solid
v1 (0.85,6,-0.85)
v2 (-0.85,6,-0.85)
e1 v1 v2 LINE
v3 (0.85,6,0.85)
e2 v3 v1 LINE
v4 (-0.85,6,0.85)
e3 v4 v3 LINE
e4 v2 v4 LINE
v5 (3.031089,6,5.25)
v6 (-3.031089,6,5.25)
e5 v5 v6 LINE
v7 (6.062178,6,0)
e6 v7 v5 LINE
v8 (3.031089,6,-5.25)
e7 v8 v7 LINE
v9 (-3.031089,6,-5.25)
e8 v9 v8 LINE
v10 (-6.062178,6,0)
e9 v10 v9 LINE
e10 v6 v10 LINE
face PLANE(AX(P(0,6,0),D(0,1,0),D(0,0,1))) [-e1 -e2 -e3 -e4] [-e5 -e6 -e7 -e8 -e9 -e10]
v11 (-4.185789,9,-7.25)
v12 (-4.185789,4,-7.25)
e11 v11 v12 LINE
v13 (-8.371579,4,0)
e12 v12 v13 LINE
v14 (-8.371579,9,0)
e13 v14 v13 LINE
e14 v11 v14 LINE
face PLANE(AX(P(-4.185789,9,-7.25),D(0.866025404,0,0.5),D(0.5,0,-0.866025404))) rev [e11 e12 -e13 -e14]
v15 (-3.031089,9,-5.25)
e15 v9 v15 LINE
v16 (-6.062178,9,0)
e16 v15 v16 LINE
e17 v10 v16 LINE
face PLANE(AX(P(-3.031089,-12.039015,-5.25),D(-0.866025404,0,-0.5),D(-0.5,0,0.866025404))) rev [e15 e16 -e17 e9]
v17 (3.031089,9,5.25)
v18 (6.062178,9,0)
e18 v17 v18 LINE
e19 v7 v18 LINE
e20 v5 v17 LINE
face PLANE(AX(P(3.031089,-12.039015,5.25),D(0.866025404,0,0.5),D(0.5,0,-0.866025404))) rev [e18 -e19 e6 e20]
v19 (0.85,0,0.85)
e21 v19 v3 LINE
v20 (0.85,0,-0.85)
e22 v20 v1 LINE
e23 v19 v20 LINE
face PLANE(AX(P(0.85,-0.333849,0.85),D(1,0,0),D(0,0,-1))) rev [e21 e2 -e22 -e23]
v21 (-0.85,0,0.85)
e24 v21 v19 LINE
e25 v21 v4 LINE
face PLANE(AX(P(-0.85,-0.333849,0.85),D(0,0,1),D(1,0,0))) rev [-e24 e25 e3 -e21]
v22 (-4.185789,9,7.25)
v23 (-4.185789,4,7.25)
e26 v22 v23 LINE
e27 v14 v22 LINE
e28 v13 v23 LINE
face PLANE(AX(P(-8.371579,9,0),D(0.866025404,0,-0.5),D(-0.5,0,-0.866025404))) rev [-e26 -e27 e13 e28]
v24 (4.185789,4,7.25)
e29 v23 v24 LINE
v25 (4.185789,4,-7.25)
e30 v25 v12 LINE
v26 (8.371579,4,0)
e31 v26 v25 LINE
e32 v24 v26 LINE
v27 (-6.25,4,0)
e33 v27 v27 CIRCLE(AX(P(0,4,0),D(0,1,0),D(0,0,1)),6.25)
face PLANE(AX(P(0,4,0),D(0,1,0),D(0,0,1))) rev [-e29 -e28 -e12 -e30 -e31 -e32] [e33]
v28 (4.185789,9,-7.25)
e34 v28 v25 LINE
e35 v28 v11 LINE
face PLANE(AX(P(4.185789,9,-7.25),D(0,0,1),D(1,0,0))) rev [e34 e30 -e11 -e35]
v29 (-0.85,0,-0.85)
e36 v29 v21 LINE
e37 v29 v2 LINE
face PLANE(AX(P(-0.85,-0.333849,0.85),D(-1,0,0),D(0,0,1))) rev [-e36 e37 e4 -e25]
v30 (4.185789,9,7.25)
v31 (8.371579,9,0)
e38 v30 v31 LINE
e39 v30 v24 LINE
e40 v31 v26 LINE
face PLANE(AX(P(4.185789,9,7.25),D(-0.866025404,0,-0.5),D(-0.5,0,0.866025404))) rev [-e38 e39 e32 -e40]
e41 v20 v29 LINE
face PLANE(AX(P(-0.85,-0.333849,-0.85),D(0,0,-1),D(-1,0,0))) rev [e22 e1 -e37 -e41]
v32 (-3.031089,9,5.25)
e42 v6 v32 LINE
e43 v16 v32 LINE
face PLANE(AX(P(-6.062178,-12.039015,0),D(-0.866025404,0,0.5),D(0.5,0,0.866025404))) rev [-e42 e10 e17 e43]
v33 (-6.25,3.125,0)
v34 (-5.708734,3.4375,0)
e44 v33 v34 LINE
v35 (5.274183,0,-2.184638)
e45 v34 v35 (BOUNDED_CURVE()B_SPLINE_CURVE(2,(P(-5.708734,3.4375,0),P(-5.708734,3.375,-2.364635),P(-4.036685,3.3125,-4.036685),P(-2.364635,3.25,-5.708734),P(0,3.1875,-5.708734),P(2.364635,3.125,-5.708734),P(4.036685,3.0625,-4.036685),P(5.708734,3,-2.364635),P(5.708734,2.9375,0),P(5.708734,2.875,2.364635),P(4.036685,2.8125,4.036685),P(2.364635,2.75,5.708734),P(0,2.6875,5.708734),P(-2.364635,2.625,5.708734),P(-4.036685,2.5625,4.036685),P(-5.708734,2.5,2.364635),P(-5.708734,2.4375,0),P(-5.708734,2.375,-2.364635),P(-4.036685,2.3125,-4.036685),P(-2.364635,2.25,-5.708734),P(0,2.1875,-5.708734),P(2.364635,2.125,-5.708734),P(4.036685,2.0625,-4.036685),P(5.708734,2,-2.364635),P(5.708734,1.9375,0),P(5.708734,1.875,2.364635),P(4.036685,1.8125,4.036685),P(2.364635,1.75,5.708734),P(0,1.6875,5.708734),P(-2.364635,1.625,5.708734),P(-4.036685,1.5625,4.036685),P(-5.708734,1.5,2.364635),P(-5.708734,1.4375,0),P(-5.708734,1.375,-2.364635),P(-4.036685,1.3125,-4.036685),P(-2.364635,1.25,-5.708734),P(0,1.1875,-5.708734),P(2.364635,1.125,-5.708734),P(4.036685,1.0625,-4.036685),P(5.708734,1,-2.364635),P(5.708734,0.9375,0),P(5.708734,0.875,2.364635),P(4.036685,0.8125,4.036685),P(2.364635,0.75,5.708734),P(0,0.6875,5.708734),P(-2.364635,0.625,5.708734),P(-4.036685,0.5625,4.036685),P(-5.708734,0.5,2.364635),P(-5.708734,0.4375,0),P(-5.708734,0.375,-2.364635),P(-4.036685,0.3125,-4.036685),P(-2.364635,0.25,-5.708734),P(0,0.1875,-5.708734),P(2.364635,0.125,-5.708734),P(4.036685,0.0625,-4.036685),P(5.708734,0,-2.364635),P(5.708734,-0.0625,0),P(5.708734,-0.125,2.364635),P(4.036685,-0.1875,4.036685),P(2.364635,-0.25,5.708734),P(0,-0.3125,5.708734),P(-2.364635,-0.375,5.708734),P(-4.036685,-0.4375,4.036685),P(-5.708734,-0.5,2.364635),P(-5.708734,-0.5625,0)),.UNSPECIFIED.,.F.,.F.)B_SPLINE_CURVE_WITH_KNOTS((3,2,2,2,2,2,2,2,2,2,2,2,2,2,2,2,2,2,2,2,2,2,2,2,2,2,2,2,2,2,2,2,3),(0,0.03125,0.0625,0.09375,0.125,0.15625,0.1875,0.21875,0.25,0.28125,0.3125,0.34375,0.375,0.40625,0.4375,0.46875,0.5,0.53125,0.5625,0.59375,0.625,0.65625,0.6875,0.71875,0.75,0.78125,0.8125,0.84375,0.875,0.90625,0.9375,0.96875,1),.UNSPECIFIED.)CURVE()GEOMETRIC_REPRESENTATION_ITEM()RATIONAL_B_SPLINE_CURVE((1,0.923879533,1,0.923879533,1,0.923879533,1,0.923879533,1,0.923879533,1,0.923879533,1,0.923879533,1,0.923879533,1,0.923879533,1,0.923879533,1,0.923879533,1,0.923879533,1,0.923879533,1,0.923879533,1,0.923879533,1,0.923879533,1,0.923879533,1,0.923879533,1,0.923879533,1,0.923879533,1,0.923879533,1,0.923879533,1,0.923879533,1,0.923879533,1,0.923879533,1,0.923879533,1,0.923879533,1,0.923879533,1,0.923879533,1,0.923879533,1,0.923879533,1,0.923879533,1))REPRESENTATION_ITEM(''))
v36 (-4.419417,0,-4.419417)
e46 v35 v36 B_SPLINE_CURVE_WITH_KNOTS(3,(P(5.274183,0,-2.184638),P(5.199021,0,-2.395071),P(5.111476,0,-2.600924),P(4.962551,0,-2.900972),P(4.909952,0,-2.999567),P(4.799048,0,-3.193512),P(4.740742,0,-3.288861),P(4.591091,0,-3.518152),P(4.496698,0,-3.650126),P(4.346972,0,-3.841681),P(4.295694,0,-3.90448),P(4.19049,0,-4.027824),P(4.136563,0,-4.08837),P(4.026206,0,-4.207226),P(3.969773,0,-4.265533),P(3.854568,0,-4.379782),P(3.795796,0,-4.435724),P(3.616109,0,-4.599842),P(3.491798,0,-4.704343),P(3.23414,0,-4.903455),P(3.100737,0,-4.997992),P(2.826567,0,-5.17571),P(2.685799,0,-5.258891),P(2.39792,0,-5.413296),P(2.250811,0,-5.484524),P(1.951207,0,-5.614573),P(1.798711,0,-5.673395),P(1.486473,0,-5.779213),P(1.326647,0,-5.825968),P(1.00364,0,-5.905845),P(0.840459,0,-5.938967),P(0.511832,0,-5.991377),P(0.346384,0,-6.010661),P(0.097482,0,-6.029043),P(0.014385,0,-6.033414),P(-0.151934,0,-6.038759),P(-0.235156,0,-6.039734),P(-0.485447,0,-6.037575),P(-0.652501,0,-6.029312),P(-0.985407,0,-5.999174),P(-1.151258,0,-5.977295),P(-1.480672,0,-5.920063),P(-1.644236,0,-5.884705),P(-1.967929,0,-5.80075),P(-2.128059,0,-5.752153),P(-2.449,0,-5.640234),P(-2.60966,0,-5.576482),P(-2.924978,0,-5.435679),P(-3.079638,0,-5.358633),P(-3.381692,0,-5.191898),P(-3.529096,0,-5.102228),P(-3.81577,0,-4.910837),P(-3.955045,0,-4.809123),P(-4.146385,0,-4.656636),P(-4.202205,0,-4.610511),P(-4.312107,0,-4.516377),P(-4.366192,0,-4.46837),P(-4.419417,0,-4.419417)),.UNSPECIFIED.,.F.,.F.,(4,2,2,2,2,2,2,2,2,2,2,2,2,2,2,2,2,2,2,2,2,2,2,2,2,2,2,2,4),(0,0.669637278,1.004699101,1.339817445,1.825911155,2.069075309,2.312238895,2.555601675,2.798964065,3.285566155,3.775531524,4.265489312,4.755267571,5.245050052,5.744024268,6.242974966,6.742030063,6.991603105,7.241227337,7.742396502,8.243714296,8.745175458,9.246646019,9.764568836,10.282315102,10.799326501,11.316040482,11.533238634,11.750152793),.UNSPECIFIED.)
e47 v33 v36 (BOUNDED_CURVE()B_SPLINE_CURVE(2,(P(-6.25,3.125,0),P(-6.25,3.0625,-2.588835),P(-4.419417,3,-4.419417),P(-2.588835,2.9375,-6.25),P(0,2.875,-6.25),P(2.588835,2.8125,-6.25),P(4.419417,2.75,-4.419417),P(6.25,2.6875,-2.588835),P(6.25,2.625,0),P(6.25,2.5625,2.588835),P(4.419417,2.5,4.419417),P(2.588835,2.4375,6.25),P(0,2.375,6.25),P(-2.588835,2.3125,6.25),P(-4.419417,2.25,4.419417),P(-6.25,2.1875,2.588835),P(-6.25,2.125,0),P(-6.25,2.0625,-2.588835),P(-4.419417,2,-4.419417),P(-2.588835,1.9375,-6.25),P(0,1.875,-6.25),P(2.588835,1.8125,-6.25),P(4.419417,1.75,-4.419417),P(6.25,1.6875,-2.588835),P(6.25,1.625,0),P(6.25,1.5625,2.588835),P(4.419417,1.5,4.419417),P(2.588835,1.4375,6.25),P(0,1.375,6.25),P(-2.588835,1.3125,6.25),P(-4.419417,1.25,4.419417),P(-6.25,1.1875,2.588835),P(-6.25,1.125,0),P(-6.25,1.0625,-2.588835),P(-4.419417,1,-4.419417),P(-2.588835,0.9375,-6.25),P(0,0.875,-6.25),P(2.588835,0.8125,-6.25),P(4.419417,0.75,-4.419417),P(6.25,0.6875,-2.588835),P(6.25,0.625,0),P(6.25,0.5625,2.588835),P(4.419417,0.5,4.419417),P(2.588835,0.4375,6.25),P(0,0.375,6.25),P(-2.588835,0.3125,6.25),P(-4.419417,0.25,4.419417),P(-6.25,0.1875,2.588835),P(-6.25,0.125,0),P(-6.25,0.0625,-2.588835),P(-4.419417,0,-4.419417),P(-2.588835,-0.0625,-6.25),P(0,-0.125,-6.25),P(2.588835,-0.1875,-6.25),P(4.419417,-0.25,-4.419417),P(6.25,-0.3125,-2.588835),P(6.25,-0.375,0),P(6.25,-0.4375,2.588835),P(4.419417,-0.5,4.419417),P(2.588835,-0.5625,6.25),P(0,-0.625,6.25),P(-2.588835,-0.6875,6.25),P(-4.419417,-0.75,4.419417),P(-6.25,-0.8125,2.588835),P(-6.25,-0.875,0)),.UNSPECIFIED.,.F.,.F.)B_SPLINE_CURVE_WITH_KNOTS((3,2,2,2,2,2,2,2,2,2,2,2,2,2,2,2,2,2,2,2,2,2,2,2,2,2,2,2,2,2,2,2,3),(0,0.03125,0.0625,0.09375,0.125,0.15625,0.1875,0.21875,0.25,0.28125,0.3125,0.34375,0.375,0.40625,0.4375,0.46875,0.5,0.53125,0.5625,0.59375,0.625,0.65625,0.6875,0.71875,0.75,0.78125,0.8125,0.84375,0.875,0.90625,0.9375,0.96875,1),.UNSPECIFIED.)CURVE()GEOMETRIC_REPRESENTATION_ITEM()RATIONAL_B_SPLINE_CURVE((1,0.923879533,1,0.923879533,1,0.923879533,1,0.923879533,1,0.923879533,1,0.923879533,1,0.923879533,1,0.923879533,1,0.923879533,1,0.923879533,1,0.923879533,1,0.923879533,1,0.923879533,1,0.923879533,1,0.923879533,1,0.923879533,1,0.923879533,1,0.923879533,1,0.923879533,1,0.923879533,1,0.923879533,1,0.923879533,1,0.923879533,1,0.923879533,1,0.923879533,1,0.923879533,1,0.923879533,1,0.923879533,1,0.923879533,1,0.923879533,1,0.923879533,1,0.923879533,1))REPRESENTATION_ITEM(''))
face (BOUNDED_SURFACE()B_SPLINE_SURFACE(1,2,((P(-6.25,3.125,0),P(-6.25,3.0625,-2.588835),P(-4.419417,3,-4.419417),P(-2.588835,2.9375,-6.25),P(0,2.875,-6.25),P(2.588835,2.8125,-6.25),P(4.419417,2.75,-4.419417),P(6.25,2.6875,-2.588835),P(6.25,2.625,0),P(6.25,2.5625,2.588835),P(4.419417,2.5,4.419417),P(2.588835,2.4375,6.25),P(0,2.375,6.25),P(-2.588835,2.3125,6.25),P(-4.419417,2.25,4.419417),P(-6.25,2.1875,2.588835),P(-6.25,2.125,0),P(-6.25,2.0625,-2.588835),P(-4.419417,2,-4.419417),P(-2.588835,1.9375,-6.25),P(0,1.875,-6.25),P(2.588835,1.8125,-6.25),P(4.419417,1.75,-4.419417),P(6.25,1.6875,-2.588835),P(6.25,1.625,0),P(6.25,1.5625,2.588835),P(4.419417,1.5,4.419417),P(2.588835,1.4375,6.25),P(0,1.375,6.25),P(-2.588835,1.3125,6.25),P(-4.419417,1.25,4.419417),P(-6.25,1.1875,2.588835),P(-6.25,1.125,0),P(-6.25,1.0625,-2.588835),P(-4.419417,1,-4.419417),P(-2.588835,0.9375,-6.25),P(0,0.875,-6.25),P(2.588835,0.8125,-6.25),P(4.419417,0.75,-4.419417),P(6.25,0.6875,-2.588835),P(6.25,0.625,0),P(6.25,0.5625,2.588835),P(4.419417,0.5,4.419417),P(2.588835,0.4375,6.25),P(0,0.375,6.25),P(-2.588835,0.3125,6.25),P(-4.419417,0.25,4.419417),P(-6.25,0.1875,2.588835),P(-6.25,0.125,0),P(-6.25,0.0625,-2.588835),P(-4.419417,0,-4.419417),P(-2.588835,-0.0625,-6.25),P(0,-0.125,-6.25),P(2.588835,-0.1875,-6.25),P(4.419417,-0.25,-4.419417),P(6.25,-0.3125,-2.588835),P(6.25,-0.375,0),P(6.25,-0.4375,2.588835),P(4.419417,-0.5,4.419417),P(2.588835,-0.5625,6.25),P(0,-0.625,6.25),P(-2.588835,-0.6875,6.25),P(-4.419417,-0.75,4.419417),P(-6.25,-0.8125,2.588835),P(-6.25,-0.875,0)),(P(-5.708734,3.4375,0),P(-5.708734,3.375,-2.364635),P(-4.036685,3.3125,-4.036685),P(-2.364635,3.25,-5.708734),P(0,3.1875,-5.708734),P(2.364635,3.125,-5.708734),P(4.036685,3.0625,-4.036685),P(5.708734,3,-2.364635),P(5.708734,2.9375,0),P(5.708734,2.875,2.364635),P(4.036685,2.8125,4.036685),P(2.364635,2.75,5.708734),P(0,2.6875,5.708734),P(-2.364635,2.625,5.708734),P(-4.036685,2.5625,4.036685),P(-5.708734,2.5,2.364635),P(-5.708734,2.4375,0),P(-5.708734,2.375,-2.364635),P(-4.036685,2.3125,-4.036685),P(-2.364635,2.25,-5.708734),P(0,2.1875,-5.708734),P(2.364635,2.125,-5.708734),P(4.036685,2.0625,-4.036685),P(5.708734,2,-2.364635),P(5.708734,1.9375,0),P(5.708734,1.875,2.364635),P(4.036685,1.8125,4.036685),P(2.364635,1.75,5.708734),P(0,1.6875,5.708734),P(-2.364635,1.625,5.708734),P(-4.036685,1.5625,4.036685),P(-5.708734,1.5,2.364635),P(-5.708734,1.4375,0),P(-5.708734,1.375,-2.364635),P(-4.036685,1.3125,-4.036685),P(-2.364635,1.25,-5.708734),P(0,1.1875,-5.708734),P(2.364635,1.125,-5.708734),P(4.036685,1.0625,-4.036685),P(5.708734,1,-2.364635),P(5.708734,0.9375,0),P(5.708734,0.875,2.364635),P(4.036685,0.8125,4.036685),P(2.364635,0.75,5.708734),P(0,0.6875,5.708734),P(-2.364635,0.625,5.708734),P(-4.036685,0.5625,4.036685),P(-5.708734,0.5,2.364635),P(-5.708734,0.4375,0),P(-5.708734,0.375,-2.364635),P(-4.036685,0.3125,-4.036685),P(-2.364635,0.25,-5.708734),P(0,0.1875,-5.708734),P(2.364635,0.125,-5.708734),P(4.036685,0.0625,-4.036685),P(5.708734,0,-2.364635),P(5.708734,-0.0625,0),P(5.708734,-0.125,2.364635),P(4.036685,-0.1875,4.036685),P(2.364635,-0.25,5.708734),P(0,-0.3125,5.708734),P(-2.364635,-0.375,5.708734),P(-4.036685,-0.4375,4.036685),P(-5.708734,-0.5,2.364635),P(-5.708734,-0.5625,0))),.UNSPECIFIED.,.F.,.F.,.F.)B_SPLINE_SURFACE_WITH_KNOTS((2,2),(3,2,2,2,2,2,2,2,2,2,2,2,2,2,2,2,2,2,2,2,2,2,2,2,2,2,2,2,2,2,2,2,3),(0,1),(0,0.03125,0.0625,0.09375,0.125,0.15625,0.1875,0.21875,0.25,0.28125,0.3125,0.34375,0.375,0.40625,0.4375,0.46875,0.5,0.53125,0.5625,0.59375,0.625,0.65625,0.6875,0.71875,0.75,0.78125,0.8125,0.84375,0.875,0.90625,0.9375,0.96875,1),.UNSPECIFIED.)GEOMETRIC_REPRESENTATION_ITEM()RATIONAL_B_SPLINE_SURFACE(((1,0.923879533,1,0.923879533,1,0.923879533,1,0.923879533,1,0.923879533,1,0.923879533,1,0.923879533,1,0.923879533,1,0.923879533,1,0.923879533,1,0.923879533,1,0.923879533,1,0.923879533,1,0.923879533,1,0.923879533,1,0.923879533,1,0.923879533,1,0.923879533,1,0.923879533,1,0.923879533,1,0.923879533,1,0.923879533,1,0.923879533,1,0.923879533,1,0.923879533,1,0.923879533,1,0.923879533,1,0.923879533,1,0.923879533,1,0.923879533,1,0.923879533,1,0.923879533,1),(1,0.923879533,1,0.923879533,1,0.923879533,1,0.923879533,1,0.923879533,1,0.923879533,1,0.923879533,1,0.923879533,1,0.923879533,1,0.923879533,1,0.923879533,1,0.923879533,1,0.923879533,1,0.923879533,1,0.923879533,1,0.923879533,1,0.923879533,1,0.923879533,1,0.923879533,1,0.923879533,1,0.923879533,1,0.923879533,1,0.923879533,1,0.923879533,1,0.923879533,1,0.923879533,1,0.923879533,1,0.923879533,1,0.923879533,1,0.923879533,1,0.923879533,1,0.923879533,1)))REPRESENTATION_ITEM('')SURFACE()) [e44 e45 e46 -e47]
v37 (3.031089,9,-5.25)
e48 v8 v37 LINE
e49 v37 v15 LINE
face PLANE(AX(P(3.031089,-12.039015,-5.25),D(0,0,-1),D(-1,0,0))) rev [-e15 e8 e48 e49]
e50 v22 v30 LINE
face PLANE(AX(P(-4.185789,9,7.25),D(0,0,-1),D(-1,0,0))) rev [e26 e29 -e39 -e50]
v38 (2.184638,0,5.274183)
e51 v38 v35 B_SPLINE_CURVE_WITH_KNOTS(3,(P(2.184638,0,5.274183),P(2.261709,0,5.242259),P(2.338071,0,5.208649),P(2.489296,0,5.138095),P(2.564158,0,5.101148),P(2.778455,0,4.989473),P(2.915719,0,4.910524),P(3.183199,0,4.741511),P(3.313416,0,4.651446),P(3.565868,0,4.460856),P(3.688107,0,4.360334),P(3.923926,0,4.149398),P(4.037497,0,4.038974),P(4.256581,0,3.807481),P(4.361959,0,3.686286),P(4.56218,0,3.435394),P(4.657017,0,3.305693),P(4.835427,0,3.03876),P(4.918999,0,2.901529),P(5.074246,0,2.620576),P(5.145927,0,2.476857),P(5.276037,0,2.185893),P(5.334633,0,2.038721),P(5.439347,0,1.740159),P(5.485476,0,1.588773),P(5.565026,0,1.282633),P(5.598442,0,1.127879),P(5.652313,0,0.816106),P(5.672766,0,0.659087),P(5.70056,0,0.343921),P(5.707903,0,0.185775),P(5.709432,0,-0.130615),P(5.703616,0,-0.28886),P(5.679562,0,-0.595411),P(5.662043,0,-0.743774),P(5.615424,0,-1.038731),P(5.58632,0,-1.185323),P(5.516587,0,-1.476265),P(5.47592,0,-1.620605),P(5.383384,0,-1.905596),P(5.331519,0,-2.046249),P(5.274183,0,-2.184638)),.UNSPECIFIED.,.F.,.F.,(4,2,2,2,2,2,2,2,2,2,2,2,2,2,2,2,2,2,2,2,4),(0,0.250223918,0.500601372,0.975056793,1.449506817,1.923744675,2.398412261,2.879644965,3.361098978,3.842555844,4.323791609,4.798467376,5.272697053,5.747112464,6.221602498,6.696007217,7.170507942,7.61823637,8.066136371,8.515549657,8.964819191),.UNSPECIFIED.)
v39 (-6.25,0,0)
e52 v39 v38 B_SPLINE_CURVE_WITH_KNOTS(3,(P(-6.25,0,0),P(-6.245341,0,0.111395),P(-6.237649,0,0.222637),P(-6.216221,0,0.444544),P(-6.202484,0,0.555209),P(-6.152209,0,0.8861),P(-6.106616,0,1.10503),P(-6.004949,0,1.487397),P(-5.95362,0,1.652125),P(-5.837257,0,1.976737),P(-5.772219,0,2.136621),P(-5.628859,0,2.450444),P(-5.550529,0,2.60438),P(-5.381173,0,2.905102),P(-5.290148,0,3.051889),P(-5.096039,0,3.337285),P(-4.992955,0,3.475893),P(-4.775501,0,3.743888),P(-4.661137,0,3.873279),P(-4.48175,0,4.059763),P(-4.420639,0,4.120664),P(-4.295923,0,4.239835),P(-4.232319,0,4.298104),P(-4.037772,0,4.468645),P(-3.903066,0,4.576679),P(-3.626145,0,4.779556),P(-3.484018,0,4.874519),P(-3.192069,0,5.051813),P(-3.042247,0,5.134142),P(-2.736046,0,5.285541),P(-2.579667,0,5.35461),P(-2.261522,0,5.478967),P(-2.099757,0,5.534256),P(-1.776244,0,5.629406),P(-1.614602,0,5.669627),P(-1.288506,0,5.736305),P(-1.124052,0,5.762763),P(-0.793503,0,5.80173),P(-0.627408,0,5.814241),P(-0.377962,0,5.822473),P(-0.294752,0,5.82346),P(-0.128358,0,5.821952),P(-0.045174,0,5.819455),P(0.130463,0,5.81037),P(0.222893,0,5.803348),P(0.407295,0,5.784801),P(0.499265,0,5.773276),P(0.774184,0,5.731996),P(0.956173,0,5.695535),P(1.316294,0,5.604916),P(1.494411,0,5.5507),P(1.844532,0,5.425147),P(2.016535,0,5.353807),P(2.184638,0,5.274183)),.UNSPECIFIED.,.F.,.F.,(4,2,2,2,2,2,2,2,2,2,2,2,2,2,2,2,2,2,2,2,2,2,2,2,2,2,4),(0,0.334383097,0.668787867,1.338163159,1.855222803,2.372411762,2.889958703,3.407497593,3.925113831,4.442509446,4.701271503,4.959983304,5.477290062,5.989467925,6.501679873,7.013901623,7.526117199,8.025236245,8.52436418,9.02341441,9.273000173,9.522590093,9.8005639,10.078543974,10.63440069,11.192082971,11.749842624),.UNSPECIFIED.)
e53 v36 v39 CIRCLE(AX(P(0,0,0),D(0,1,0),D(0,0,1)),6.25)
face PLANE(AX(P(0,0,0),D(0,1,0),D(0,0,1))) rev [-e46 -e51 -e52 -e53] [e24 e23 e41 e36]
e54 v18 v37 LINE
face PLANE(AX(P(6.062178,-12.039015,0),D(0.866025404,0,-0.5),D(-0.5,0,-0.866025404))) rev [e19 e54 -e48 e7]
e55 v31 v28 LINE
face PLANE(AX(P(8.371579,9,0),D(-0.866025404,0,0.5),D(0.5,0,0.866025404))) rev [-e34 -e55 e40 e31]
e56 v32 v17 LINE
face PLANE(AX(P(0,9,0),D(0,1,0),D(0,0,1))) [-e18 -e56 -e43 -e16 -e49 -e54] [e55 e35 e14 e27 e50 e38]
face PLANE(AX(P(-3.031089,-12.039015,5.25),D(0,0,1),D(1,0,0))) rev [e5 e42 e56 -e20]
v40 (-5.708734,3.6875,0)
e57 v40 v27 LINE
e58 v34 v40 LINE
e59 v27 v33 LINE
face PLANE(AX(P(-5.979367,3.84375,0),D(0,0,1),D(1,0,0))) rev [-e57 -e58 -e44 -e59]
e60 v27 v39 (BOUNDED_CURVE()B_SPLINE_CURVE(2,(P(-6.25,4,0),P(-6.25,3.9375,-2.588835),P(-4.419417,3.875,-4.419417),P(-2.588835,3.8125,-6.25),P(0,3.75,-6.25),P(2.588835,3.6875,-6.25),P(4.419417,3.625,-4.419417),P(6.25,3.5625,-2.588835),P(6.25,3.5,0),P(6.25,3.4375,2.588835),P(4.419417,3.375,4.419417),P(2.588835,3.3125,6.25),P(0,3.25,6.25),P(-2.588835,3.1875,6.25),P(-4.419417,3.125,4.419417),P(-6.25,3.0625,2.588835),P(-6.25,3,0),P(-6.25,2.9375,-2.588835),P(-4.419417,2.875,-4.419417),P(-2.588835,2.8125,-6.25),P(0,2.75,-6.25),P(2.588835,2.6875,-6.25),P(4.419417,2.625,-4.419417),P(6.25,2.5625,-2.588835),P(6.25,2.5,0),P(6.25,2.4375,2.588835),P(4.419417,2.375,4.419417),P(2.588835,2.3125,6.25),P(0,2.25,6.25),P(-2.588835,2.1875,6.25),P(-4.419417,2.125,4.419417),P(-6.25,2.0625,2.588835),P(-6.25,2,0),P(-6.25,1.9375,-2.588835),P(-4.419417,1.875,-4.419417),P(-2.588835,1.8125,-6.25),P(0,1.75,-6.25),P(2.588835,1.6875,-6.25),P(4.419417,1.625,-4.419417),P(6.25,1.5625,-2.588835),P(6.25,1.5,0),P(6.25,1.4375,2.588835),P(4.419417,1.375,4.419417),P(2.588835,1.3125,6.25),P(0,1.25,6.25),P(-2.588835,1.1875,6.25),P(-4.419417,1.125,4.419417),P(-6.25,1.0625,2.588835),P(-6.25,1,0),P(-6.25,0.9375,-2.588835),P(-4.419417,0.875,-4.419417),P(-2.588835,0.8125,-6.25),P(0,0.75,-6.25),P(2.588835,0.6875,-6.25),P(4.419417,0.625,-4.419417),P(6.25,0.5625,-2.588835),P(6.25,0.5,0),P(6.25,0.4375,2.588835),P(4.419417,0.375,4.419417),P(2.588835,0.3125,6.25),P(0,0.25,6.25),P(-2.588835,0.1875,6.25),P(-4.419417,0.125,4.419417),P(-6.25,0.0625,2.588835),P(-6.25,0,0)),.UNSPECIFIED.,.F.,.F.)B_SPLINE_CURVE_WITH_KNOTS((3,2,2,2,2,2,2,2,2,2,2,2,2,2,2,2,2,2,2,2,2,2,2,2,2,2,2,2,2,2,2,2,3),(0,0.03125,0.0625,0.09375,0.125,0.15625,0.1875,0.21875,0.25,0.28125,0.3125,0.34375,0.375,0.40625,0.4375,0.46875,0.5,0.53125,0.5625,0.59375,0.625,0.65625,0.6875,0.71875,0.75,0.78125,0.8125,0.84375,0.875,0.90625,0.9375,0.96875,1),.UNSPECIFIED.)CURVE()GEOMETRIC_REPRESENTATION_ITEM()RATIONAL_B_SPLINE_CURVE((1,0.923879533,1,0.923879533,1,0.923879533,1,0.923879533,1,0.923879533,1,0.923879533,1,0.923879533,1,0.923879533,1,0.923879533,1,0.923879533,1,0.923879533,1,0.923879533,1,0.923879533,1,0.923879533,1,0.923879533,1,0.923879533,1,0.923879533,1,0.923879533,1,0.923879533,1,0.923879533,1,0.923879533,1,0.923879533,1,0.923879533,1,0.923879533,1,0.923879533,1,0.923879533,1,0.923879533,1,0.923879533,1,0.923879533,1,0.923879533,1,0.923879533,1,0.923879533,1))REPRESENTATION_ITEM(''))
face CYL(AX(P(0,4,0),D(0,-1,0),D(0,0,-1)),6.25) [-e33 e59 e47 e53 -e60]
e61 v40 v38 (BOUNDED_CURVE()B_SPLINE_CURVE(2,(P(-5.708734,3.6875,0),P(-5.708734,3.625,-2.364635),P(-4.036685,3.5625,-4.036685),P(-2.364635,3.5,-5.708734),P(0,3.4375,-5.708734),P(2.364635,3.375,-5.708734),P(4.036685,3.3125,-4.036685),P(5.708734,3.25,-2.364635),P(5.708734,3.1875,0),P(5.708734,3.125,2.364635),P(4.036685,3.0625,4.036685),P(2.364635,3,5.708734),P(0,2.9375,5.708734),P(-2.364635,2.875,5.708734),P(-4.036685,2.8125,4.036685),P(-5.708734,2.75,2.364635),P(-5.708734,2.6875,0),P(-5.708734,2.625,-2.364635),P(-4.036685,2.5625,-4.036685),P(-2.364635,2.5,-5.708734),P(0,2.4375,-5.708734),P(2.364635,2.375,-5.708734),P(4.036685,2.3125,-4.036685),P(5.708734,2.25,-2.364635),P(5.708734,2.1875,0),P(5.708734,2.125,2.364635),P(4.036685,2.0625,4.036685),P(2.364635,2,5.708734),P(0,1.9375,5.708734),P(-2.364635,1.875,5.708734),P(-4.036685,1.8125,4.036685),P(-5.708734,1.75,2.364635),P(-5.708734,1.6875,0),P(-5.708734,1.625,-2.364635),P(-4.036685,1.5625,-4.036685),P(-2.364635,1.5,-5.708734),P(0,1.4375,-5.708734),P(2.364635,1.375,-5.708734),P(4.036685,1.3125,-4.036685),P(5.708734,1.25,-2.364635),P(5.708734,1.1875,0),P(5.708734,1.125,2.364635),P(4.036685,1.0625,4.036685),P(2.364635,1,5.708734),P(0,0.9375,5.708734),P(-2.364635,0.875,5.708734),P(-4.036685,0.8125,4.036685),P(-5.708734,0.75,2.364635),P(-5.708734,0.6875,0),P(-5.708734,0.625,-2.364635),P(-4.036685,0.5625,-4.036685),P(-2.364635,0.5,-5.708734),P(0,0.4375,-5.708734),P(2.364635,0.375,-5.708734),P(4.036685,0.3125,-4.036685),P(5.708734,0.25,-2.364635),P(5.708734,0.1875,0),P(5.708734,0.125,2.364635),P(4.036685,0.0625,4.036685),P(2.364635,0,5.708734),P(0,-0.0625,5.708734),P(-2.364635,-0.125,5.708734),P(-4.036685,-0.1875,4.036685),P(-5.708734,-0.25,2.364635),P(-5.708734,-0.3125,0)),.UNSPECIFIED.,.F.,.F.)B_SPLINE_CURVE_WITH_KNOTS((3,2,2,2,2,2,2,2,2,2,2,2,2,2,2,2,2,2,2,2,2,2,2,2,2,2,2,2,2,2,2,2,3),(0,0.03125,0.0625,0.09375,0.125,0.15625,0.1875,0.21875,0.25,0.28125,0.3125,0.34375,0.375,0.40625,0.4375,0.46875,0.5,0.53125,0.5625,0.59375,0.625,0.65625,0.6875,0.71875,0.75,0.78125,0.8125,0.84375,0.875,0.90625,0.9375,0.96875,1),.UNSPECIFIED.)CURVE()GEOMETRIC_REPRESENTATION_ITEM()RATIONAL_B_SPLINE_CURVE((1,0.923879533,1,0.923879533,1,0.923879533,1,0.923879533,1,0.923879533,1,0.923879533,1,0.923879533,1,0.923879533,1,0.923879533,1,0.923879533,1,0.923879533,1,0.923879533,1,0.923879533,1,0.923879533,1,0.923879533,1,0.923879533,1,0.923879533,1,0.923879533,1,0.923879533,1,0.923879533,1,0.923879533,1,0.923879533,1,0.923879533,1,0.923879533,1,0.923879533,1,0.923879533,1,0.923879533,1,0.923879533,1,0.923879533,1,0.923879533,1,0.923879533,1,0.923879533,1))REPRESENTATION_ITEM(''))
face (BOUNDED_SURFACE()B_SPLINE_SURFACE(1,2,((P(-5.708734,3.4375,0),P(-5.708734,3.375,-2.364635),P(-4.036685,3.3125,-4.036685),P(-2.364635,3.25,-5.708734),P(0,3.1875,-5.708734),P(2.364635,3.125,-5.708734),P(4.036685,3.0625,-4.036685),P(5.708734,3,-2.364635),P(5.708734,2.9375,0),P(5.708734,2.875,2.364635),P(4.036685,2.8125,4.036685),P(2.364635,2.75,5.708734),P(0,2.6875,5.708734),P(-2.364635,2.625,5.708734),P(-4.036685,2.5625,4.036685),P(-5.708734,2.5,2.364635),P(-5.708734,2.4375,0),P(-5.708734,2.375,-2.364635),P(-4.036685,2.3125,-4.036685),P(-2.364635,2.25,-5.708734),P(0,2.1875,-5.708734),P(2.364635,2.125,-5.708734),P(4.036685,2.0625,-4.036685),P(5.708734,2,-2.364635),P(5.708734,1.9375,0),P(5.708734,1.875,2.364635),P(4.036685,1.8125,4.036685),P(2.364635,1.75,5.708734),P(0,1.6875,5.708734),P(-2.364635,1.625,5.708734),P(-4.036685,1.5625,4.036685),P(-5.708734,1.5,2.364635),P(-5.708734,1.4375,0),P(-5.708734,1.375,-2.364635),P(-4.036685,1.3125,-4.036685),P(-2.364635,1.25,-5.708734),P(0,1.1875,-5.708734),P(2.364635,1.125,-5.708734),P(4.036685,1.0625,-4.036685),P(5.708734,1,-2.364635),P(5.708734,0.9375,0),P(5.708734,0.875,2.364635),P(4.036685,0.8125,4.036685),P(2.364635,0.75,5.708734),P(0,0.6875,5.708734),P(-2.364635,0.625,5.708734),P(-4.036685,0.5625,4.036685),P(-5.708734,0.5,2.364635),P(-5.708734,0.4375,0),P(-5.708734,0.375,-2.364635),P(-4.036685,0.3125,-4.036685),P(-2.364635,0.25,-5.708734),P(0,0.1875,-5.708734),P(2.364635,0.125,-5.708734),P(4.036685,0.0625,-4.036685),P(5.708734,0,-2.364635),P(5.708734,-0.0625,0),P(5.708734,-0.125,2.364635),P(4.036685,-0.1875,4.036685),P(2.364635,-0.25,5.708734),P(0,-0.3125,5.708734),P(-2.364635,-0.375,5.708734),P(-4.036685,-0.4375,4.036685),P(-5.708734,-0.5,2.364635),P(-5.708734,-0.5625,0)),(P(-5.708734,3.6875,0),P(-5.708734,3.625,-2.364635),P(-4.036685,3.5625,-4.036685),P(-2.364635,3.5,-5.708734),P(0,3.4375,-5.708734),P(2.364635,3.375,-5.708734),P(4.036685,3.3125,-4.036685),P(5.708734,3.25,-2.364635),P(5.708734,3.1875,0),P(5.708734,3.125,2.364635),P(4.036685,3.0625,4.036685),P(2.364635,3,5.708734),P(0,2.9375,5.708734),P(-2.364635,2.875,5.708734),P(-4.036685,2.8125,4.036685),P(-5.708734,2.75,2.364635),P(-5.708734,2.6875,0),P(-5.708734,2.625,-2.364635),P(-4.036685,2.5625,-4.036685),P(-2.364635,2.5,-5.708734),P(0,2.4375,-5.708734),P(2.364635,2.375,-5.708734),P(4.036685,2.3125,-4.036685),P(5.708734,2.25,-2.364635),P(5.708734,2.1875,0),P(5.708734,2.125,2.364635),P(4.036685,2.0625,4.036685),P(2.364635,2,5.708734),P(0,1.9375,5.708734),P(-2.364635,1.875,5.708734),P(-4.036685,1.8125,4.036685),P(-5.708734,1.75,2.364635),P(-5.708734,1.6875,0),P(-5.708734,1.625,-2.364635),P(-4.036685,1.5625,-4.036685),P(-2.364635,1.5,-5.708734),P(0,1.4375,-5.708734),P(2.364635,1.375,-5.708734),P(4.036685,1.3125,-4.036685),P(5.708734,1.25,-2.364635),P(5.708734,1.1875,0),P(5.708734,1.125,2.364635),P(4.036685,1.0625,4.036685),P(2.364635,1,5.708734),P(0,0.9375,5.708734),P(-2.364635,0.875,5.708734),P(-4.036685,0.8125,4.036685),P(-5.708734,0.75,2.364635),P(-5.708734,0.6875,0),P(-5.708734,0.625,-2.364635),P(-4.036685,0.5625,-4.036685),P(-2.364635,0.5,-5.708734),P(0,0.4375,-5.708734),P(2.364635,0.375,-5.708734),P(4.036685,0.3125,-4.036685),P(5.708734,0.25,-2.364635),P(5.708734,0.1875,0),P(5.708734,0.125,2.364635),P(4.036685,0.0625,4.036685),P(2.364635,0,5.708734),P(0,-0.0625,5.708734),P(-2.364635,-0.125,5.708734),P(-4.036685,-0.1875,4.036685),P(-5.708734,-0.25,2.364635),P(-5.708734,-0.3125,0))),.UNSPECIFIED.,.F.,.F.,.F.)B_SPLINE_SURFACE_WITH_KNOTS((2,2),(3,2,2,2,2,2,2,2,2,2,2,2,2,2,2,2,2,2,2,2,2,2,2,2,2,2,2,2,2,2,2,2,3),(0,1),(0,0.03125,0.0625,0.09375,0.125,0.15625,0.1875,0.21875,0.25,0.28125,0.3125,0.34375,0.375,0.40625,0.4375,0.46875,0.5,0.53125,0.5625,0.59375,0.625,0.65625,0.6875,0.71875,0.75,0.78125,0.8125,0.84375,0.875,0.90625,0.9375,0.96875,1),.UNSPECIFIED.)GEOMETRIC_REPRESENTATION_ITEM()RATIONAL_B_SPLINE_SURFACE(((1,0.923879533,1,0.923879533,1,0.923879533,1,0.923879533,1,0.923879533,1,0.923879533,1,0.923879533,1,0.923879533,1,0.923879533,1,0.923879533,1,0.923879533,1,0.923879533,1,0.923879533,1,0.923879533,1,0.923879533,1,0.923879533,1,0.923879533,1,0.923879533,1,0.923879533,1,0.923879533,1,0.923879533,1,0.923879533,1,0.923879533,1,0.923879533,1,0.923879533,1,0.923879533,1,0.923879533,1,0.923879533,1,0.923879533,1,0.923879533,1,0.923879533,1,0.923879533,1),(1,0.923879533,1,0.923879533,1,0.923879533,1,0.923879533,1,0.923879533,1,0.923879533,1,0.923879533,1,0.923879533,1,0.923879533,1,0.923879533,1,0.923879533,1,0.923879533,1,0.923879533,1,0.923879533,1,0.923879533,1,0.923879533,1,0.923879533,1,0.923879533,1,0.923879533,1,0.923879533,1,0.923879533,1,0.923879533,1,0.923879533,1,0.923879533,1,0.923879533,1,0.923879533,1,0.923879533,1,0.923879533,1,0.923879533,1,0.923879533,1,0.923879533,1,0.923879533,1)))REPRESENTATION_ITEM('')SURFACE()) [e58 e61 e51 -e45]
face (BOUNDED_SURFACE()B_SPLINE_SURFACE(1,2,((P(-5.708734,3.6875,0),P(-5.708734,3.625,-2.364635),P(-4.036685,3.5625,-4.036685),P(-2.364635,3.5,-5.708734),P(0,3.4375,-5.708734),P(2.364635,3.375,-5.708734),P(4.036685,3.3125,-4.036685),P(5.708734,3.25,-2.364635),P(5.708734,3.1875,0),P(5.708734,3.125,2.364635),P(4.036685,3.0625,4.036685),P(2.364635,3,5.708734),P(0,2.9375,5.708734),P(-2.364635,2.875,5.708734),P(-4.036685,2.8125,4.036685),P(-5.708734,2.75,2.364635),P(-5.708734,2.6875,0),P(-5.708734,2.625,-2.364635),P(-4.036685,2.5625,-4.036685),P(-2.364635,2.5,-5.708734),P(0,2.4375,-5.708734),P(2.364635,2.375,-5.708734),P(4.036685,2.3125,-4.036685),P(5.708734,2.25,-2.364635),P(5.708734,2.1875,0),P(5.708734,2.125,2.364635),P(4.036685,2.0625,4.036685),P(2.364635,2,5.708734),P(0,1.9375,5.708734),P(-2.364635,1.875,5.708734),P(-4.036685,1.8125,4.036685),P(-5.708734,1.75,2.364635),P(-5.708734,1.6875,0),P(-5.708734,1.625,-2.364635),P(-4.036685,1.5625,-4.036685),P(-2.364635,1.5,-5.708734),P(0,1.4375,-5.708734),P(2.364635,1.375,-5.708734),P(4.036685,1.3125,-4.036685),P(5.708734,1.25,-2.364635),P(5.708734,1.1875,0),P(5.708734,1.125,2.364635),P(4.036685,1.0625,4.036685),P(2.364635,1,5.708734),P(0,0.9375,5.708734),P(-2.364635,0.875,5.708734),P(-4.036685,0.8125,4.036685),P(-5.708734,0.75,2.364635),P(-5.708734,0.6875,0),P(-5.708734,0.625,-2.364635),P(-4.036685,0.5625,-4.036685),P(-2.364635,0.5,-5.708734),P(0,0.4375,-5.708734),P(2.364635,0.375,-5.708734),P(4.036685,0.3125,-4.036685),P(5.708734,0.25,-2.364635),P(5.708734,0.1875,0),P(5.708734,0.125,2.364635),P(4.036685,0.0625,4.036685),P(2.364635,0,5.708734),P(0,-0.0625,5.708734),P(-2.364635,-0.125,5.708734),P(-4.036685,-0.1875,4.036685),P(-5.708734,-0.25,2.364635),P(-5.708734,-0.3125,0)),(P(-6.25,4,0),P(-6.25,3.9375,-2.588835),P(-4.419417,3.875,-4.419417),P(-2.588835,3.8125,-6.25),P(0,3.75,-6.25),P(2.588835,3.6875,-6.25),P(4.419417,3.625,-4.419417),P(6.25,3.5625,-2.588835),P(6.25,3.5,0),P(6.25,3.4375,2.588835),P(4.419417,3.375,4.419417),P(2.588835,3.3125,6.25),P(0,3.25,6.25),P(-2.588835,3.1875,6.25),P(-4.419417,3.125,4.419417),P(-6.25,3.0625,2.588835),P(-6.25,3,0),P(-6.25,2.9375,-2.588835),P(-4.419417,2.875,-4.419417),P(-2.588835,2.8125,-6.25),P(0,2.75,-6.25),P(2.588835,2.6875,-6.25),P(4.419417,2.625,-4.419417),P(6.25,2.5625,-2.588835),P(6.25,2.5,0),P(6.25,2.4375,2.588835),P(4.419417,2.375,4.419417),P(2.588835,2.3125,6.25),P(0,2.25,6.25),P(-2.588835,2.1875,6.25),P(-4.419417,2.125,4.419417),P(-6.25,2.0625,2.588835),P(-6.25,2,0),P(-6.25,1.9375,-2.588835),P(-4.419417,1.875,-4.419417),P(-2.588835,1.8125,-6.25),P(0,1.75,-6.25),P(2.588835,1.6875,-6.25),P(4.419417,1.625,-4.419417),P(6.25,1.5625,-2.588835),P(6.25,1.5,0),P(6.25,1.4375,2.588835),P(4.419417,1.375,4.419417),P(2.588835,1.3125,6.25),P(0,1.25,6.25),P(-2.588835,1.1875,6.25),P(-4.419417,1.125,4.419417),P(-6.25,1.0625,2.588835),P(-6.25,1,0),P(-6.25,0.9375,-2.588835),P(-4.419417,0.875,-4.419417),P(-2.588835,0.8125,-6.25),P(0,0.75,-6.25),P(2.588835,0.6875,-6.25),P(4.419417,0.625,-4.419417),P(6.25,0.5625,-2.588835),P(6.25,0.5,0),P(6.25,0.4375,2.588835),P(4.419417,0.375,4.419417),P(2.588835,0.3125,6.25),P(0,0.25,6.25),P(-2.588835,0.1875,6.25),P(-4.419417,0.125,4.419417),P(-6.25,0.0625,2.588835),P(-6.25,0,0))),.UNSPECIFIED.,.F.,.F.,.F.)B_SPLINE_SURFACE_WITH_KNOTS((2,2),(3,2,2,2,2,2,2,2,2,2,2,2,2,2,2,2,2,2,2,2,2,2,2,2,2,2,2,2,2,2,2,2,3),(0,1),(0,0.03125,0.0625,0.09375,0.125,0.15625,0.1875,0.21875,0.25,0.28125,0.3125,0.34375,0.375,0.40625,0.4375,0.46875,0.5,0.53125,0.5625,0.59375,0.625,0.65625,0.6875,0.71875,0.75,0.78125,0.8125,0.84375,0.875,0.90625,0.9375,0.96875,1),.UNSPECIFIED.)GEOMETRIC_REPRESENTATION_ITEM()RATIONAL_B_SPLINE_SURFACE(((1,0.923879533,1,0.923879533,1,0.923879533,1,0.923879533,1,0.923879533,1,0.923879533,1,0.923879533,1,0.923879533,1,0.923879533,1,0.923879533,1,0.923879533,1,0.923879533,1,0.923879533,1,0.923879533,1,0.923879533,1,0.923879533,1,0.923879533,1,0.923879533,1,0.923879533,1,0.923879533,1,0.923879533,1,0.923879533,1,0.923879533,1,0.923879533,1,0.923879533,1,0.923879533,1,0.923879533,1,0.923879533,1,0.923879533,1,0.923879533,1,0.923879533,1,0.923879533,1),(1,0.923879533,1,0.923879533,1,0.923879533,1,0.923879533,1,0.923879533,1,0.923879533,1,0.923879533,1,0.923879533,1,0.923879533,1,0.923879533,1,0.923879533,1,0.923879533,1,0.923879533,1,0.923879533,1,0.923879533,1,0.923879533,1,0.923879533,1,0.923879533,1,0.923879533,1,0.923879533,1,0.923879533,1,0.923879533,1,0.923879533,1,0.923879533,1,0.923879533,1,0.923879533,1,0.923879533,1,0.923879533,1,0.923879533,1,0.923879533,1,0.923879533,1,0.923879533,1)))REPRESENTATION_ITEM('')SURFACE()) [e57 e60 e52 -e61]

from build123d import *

# Parameters (mm, degrees)
SKETCH1_R               = 6.25
BOSS_EXTRUDE1_DEPTH     = 4
THREAD1_PITCH           = 1
BOSS_EXTRUDE2_DEPTH     = 5
CUT_EXTRUDE1_DEPTH      = 3
CUT_EXTRUDE2_DEPTH      = 13.59546881
CUT_EXTRUDE2_DEPTH_BACK = 13.59546881
SKETCH6_W               = 1.7
SKETCH6_H               = 1.7


with BuildPart() as part:
    # Sketch1 → Boss-Extrude1 (new body)
    with BuildSketch(Plane(origin=(0, 0, 0), x_dir=(1, 0, 0), z_dir=(0, 1, 0))):
        with Locations(Location((0, 0, 0), (0, 0, 270))):
            Circle(SKETCH1_R)
    extrude(amount=BOSS_EXTRUDE1_DEPTH)

    # Thread1: the profile of Thread Profile1 profile screwed along a right-hand helix of 4 turns, 8 arcs to a turn; built about Z, then put on its axis
    thread1_z = Axis((0, 0, 0), (0, 0, 1))
    thread1_corners = [(6.2503, 0, -0.000173205), (6.2503, 0, 0.875173202), (5.708734125, 0, 0.562499999), (5.708734125, 0, 0.312499999)]
    with BuildLine(mode=Mode.PRIVATE) as thread1_profile:
        Line(thread1_corners[0], thread1_corners[1])
        Line(thread1_corners[1], thread1_corners[2])
        Line(thread1_corners[2], thread1_corners[3])
        Line(thread1_corners[3], thread1_corners[0])
    thread1_cap = Face(thread1_profile.wire())
    thread1_turn_angles = [0, 22.5, 45, 67.5, 90, 112.5, 135, 157.5, 180, 202.5, 225, 247.5, 270, 292.5, 315, 337.5, 360]
    thread1_turn_weights = [1, 0.9238795325112867, 1, 0.9238795325112867, 1, 0.9238795325112867, 1, 0.9238795325112867, 1, 0.9238795325112867, 1, 0.9238795325112867, 1, 0.9238795325112867, 1, 0.9238795325112867, 1]
    thread1_turn_rails = [Edge.make_bspline([Vector(p[0], p[1], 0).rotate(thread1_z, thread1_turn_angles[k]) / thread1_turn_weights[k] + Vector(0, 0, p[2] + THREAD1_PITCH * thread1_turn_angles[k] / 360) for k in range(17)], [0, 0, 0, 1, 1, 2, 2, 3, 3, 4, 4, 5, 5, 6, 6, 7, 7, 8, 8, 8], 2, thread1_turn_weights) for p in thread1_corners]
    thread1_turn_sides = [Face.make_surface_from_curves(thread1_turn_rails[p[0]], thread1_turn_rails[p[1]]) for p in [(0, 1), (1, 2), (2, 3), (3, 0)]]
    thread1 = Plane(origin=(0, 4, 0), x_dir=(-1, 0, 0), z_dir=(0, -1, 0)) * Solid(Shell([*[p.moved(Location((0, 0, THREAD1_PITCH * i))) for i in range(4) for p in thread1_turn_sides], thread1_cap, thread1_cap.rotate(thread1_z, 1440).moved(Location((0, 0, THREAD1_PITCH * 1440 / 360)))]))
    add(thread1, mode=Mode.SUBTRACT)

    # Sketch4 → Boss-Extrude2 (add)
    with BuildSketch(Plane(origin=(0, 4, 0), x_dir=(1, 0, 0), z_dir=(0, 1, 0))):
        Polygon((8.371578903, 0), (4.185789452, 7.25), (-4.185789452, 7.25), (-8.371578903, 0), (-4.185789452, -7.25), (4.185789452, -7.25), align=None)
    extrude(amount=BOSS_EXTRUDE2_DEPTH)

    # Sketch5 → Cut-Extrude1 (cut)
    with BuildSketch(Plane(origin=(0, 9, 0), x_dir=(1, 0, 0), z_dir=(0, 1, 0))):
        Polygon((3.031088913, 5.25), (-3.031088913, 5.25), (-6.062177826, 0), (-3.031088913, -5.25), (3.031088913, -5.25), (6.062177826, 0), align=None)
    extrude(amount=-CUT_EXTRUDE1_DEPTH, mode=Mode.SUBTRACT)

    # Sketch6 → Cut-Extrude2 (cut, two sides: drawn at the far end of the back side and taken through both)
    with BuildSketch(Plane(origin=(0, 6, 0), x_dir=(1, 0, 0), z_dir=(0, 1, 0)).offset(-CUT_EXTRUDE2_DEPTH_BACK)):
        Rectangle(SKETCH6_W, SKETCH6_H)
    extrude(amount=CUT_EXTRUDE2_DEPTH + CUT_EXTRUDE2_DEPTH_BACK, mode=Mode.SUBTRACT)


solid = part.part
